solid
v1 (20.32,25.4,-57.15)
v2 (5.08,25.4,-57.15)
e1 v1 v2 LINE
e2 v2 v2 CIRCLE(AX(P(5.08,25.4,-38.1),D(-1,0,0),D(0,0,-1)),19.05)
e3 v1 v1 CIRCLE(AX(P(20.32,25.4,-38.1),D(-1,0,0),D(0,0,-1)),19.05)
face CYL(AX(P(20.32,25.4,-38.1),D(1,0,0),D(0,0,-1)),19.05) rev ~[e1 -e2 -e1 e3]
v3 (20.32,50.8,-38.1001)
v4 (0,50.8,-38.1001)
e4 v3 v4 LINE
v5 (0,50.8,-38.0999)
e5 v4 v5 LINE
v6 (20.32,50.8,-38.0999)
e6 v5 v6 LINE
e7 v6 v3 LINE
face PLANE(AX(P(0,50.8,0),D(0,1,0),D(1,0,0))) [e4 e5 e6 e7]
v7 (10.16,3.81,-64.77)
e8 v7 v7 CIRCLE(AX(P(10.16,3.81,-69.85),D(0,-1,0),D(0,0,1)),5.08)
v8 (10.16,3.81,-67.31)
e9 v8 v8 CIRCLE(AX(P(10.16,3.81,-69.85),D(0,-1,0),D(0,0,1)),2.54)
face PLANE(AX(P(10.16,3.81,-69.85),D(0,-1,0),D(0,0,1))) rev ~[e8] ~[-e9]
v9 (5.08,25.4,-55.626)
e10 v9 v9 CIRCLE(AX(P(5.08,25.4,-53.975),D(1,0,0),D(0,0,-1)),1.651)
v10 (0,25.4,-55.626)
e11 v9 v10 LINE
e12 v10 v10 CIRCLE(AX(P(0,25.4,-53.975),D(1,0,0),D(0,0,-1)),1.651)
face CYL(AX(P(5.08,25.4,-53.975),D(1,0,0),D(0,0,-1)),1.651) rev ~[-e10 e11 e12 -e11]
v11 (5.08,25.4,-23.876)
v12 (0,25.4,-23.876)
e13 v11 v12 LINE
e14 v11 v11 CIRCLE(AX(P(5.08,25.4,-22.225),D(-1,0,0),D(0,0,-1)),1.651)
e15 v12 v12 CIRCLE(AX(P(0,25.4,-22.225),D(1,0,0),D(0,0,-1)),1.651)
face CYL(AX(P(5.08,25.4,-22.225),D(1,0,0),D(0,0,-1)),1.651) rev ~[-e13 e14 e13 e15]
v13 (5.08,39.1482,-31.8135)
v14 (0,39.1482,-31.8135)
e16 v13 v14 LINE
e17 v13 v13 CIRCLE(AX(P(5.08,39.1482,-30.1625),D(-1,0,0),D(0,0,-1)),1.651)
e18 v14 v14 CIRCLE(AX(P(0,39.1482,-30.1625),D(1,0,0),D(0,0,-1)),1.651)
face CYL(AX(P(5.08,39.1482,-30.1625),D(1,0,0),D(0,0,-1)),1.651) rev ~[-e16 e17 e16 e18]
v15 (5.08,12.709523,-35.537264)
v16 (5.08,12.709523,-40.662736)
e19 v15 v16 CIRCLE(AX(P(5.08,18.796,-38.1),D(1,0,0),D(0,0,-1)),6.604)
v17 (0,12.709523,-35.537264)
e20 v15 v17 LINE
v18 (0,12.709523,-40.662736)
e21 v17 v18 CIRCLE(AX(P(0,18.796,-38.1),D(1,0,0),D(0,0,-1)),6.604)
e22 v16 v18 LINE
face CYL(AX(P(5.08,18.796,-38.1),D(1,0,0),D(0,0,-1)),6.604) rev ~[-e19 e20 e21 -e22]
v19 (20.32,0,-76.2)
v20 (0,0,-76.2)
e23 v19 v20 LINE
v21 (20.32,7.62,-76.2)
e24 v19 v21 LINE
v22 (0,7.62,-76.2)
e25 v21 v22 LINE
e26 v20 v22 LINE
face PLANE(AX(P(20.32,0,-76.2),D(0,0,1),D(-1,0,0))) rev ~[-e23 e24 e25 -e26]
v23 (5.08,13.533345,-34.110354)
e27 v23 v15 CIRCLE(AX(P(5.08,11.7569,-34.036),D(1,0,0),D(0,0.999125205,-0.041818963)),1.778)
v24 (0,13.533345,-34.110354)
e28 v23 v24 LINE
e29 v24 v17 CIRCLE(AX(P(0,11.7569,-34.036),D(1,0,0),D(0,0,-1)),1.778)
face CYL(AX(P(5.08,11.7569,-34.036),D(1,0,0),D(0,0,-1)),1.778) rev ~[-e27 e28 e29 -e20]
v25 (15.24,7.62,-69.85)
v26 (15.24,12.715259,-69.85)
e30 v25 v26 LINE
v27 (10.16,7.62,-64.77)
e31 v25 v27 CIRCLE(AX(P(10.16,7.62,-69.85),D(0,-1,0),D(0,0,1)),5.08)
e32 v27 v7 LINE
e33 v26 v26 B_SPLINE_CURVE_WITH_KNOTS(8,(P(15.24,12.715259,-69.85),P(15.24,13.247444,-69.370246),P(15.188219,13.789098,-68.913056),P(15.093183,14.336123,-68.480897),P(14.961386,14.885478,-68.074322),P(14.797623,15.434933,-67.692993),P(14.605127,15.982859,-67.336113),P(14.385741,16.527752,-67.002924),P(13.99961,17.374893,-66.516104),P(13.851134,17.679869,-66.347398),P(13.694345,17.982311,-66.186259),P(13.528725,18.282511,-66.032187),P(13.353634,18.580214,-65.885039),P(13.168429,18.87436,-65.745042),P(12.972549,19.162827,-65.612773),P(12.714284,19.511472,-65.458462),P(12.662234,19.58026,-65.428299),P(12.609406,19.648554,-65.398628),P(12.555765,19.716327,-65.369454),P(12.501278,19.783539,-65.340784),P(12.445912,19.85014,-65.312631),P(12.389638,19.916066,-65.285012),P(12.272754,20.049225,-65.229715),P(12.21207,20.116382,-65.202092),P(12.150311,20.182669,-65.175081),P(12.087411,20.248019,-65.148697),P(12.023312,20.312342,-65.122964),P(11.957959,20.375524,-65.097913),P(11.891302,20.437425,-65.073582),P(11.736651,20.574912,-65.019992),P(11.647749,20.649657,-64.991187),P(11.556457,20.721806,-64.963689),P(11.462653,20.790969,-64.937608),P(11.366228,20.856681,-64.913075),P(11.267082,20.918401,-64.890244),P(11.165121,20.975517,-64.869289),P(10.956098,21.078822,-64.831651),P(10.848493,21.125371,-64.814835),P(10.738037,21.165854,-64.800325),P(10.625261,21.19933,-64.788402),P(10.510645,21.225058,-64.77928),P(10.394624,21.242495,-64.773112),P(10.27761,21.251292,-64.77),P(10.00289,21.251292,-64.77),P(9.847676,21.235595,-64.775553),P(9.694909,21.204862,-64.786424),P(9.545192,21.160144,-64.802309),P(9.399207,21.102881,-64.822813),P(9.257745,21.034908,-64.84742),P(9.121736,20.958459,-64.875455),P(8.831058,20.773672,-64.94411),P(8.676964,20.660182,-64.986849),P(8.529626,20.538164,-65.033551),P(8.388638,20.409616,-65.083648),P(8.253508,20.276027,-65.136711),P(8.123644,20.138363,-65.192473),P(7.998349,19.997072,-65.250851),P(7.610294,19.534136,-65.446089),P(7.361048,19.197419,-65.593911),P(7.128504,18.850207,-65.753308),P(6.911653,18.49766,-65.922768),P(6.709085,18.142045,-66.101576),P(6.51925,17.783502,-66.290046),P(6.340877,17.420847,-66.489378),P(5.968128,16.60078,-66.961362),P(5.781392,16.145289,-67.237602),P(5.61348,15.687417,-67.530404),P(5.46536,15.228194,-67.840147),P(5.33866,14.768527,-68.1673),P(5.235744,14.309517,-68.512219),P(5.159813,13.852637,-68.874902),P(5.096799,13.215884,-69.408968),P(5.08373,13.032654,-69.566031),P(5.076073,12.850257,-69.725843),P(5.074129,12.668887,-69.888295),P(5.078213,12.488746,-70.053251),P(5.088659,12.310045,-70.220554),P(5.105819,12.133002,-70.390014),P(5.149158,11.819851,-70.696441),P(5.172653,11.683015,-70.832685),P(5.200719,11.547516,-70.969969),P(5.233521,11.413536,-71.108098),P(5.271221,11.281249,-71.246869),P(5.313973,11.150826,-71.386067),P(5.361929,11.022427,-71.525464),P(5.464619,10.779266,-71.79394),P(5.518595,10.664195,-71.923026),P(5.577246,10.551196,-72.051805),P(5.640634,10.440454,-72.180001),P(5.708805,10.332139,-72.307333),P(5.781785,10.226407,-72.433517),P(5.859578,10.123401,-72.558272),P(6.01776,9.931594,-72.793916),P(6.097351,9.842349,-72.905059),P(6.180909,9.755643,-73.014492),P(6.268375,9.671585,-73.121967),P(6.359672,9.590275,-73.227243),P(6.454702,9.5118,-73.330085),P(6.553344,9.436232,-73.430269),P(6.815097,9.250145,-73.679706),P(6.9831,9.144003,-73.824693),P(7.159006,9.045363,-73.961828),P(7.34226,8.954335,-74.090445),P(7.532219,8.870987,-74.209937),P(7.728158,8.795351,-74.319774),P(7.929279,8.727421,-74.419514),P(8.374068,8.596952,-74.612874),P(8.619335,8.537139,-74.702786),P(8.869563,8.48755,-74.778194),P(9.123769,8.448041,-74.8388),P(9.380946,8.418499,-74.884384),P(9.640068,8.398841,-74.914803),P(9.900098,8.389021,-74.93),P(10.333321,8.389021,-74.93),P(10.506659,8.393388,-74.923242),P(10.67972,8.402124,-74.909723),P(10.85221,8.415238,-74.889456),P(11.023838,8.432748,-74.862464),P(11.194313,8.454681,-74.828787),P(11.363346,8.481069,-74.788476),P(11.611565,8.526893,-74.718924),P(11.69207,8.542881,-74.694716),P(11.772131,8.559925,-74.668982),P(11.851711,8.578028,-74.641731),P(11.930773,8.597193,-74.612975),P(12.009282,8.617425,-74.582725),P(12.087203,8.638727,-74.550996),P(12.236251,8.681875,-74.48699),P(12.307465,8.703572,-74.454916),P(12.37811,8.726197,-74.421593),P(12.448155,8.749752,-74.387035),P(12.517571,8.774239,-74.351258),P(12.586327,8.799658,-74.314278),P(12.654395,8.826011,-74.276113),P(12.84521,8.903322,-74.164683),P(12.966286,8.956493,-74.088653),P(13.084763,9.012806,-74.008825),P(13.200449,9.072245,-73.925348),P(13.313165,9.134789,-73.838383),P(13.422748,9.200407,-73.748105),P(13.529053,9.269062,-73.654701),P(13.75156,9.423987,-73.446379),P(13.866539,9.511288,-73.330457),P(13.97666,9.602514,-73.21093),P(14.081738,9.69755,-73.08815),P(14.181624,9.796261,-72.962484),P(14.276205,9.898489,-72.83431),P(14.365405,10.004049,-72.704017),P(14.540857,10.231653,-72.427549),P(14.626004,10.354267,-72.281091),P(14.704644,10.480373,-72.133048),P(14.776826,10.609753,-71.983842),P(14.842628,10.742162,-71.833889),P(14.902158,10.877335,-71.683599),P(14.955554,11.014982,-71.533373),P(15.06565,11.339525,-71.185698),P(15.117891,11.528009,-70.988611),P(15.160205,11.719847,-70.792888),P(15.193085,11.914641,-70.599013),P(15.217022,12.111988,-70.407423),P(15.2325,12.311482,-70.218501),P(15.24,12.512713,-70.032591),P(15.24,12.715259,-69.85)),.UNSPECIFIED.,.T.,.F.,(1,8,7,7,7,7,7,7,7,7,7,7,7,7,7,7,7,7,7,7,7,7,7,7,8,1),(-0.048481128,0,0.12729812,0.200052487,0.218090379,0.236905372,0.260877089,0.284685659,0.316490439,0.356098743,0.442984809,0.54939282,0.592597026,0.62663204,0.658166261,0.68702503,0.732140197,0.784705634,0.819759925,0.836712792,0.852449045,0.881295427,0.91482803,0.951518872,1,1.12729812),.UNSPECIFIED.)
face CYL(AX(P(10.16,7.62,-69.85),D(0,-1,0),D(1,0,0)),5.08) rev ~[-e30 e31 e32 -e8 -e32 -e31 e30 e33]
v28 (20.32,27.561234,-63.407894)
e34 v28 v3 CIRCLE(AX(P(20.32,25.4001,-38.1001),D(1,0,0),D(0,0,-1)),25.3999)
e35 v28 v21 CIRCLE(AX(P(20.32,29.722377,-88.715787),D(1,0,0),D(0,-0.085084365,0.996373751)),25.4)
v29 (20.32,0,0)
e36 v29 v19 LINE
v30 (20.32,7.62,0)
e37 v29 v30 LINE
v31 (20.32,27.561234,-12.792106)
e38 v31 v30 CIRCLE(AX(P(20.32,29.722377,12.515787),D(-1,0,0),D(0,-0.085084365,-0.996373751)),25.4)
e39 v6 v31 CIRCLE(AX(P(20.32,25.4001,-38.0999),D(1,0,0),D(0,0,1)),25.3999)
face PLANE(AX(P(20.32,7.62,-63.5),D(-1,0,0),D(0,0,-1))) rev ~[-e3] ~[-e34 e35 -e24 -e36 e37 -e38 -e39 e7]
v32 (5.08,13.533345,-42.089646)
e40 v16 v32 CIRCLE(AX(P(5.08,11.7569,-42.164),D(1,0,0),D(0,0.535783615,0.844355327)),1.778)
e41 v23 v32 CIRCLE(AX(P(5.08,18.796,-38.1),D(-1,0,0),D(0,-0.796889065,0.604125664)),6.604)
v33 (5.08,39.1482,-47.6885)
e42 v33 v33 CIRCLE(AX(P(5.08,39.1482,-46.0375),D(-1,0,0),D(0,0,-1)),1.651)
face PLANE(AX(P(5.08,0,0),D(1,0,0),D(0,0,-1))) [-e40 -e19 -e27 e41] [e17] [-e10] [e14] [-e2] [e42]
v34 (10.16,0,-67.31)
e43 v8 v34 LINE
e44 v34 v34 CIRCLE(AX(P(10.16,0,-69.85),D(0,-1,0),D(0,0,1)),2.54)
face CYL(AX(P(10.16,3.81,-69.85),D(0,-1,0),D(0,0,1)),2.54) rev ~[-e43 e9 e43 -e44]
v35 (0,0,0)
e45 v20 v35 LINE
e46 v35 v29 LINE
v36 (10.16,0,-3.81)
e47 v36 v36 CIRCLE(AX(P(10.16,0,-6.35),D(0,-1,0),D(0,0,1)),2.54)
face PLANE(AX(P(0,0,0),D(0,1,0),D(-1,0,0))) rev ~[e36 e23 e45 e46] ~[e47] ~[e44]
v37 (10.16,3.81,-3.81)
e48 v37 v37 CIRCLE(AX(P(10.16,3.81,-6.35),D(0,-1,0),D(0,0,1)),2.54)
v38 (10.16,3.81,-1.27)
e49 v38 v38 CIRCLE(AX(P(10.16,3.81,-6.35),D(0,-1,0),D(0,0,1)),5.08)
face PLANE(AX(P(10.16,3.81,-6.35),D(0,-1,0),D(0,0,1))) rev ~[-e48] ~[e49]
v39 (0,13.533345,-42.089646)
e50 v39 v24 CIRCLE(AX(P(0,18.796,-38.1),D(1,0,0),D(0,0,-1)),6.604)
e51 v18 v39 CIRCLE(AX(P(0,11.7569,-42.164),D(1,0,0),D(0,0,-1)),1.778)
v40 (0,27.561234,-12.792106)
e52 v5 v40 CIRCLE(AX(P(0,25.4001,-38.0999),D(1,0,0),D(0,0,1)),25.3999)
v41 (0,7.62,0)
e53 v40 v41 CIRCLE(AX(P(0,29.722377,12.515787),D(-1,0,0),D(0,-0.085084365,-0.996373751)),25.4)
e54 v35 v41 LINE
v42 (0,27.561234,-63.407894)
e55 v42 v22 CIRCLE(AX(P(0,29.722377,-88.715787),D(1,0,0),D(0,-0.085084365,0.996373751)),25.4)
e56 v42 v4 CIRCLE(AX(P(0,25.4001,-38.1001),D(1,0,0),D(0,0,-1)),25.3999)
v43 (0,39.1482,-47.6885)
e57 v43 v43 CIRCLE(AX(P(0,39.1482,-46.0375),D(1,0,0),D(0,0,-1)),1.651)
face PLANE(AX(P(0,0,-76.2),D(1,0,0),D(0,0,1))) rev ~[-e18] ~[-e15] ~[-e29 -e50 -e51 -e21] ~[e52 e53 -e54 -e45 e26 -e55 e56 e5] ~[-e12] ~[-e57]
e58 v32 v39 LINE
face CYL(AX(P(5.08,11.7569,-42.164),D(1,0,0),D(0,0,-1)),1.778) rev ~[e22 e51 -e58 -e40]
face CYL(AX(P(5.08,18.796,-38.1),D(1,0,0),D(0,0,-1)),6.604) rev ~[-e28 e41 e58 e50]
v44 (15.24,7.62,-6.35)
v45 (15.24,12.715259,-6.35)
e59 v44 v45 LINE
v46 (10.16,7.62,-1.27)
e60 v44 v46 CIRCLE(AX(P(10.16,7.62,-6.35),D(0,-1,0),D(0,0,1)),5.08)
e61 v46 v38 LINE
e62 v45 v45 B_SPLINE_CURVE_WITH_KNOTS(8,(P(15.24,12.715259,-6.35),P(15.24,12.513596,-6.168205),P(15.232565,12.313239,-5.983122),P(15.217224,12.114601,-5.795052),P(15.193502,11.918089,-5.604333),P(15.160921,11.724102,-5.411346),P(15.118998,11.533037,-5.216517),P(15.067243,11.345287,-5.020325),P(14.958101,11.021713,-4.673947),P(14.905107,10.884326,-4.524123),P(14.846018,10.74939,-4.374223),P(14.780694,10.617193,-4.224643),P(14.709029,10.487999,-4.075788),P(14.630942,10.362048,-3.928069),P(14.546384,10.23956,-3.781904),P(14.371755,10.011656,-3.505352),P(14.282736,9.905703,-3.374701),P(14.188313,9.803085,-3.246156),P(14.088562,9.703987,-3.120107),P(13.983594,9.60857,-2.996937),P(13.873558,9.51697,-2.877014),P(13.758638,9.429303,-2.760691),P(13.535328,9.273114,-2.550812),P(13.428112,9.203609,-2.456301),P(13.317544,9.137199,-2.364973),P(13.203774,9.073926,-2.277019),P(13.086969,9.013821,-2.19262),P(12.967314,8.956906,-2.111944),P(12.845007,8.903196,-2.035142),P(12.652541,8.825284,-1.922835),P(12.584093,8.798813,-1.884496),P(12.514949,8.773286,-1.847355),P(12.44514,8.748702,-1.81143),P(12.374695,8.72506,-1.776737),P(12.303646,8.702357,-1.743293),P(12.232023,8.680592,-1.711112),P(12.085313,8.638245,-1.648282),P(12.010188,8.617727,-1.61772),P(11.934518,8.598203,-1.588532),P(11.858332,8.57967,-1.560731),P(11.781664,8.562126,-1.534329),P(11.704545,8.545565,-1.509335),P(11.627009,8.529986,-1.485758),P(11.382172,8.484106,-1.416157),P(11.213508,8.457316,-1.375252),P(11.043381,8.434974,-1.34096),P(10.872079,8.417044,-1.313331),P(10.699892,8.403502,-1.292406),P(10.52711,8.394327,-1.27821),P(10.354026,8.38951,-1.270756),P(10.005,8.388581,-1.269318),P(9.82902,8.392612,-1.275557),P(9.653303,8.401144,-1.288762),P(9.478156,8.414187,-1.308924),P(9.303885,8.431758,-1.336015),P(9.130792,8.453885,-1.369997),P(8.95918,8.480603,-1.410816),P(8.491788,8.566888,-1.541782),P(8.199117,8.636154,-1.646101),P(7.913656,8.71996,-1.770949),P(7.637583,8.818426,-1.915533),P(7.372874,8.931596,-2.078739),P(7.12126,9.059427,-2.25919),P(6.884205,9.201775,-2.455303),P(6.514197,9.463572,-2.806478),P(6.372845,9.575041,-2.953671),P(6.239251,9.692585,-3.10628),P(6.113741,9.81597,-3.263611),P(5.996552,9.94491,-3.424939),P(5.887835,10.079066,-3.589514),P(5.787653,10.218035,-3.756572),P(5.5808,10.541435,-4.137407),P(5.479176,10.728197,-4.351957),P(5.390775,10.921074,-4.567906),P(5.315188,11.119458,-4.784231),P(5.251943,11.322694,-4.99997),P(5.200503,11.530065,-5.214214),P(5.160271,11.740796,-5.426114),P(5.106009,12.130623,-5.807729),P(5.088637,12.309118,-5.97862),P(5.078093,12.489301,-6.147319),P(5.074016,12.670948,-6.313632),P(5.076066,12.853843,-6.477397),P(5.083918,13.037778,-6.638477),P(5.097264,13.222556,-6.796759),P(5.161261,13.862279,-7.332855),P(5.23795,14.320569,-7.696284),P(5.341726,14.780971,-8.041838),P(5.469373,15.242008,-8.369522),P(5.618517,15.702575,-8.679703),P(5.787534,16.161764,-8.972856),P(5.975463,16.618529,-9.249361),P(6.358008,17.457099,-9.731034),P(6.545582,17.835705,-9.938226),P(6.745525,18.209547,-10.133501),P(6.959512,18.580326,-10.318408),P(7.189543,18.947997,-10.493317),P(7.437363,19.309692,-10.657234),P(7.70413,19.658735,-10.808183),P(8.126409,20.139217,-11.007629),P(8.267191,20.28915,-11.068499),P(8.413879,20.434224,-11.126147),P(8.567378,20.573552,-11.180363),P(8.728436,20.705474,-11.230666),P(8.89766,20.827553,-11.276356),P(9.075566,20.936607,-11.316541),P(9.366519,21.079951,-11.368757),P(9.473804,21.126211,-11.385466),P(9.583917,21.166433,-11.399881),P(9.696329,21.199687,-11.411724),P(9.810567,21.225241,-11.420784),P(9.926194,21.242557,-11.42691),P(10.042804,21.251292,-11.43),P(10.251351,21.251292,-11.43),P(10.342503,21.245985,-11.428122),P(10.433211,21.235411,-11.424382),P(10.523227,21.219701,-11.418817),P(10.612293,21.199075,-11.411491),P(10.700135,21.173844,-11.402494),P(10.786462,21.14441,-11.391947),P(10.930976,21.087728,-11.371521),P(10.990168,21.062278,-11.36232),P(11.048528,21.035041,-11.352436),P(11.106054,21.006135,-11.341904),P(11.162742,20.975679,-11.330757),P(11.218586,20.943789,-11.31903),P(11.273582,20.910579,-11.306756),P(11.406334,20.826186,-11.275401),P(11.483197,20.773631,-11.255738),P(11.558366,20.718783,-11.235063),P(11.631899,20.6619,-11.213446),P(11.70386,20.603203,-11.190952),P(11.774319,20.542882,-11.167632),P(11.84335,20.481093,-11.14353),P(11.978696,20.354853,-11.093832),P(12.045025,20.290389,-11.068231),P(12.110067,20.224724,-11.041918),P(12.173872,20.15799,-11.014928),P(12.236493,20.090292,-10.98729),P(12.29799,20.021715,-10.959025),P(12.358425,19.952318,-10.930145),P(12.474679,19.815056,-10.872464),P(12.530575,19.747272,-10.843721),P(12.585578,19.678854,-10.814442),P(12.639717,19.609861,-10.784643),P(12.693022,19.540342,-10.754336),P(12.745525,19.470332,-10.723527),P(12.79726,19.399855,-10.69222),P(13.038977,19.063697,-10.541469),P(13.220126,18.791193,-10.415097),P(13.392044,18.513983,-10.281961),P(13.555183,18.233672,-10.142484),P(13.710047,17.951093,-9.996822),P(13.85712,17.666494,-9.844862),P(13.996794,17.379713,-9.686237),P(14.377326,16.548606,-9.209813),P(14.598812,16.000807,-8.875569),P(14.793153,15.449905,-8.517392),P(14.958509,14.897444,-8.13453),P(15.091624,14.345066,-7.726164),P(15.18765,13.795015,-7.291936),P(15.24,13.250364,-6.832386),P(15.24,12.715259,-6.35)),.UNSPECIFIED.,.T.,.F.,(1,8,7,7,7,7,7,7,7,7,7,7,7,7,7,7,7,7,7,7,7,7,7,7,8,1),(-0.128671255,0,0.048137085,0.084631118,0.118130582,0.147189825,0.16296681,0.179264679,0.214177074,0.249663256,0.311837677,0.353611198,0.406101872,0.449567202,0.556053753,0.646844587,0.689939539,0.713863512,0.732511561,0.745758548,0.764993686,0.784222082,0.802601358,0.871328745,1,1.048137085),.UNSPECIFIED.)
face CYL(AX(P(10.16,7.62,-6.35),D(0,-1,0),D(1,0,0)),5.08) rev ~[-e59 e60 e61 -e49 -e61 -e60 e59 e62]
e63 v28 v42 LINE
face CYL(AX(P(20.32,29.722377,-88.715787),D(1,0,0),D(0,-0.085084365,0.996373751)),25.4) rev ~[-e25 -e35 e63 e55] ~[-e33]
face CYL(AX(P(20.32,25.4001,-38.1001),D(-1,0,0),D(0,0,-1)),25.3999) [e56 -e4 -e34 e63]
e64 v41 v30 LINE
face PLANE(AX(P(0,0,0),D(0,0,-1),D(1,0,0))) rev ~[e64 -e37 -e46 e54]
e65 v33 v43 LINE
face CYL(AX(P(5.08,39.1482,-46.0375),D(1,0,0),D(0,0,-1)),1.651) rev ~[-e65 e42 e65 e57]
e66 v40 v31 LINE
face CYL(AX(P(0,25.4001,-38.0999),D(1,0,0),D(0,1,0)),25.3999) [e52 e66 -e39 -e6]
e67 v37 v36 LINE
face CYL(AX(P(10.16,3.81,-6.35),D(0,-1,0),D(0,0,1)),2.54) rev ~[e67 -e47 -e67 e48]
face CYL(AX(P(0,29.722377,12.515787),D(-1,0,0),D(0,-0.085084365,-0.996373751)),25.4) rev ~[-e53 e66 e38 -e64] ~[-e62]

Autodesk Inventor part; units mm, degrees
ref_plane "YZ Plane" through (0, 0, 0) normal (1, 0, 0) x (0, 1, 0)
ref_plane "XZ Plane" through (0, 0, 0) normal (0, 1, 0) x (-1, 0, 0)
ref_plane "XY Plane" through (0, 0, 0) normal (0, 0, 1) x (1, 0, 0)
sketch "Sketch1" plane through (0, 0, 0) normal (0, 1, 0) x (-1, 0, 0)
  line L0 (0, 0) -> (-20.32, 0)
  line L1 (-20.32, 0) -> (-20.32, -76.2)
  line L2 (-20.32, -76.2) -> (0, -76.2)
  line L3 (0, -76.2) -> (0, 0)
  dimension "d0" = 20.32
  dimension "d1" = 76.2
extrude "Extrusion1" add sketch "Sketch1" along normal blind 7.62
sketch "Sketch2" plane through (0, 7.62, 0) normal (0, 1, 0) x (1, 0, 0)
  line L0 (0, 0) -> (0, 12.7)
  line L1 (0, 12.7) -> (20.32, 12.7)
  line L2 (20.32, 12.7) -> (20.32, 63.5)
  line L3 (20.32, 63.5) -> (0, 63.5)
  line L4 (0, 63.5) -> (0, 12.7)
  dimension "d4" = 12.7
  dimension "d5" = 20.32
  dimension "d6" = 50.8
extrude "Extrusion2" add sketch "Sketch2" along normal blind 43.18
sketch "Sketch3" plane through (20.32, 0, 0) normal (1, 0, 0) x (0, 0, -1)
  line L0 (12.7, 50.8) -> (63.5, 50.8) projected
  line L1 (38.1, 50.8) -> (38.1, 25.4)
  circle A0 centre (38.1, 25.4) radius 19.05
  point P0 (0, 0)
  dimension "d9" = 25.4
  dimension "d10" = 38.1
extrude "Extrusion3" cut sketch "Sketch3" against normal blind 15.24
fillet "Fillet1" radius 25.4 2 edges at (10.16, 50.8, -63.5) (10.16, 50.8, -12.7)
sketch "Sketch6" plane through (0, 7.62, 0) normal (0, 1, 0) x (1, 0, 0)
  line L0 (0, 0) -> (20.32, 0) projected
  line L1 (10.16, 0) -> (10.16, 6.35)
  line L2 (20.32, 76.2) -> (0, 76.2) projected
  line L3 (10.16, 76.2) -> (10.16, 69.85)
  dimension "d20" = 6.35
  dimension "d21" = 6.35
fillet "Fillet2" radius 25.4 2 edges at (10.16, 7.62, -63.5) (10.16, 7.62, -12.7)
hole "Hole1" at (10.16, 7.62, -6.35) at (10.16, 7.62, -69.85) direction (0, -1, 0) diameter 5.08 end through all counterbore diameter 10.16 counterbore depth 3.81
sketch "Sketch7" plane through (10.16, 7.62, -6.35) normal (0, -1, 0) x (1, 0, 0)
  circle A0 centre (0, 0) radius 5.08
  circle A1 centre (0, -63.5) radius 2.54 projected
  line L0 (-2.54, -63.5) -> (0, -63.5)
  circle A2 centre (0, -63.5) radius 5.08
  point P0 (-10.16, 6.35)
  dimension "d30" = 10.16
  dimension "d31" = 10.16
extrude "Extrusion5" cut sketch "Sketch7" against normal blind 15.24 contours A0 | A1 | A2
sketch "Sketch9" plane through (5.08, 25.4, -38.1) normal (1, 0, 0) x (0, 0, -1)
  line L0 (0, 0) -> (0, -6.604)
  circle A0 centre (0, -6.604) radius 6.604
  line L1 (0, -6.604) -> (-3.302, -12.3232)
  line L2 (0, -6.604) -> (6.604, -6.604) construction
  line L3 (0, -6.604) -> (3.302, -12.3232)
  line L4 (0, -6.604) -> (6.604, -6.604) construction
  line L5 (-3.302, -12.3232) -> (-4.064, -13.6431)
  line L6 (3.302, -12.3232) -> (4.064, -13.6431)
  line L7 (3.302, -12.3232) -> (4.826, -12.3232) construction
  circle A1 centre (-4.064, -13.6431) radius 1.778
  circle A2 centre (4.064, -13.6431) radius 1.778
  circle A3 centre (0, 0) radius 19.05 projected
  line L8 (-19.05, 0) -> (-17.526, 0)
  line L9 (-17.526, 0) -> (-15.875, 0)
  circle A4 centre (-15.875, 0) radius 1.651
  line L10 (19.05, 0) -> (17.526, 0)
  line L11 (17.526, 0) -> (15.875, 0)
  circle A5 centre (15.875, 0) radius 1.651
  line L12 (0, 0) -> (-9.525, 16.4978)
  line L13 (0, 0) -> (9.525, 16.4978)
  line L14 (-9.525, 16.4978) -> (-8.763, 15.178)
  line L15 (-8.763, 15.178) -> (-7.9375, 13.7482)
  line L16 (9.525, 16.4978) -> (8.763, 15.178)
  line L17 (8.763, 15.178) -> (7.9375, 13.7482)
  circle A6 centre (-7.9375, 13.7482) radius 1.651
  circle A7 centre (7.9375, 13.7482) radius 1.651
  point P0 (-38.1, -25.4)
  point P1 (-2.5627, -12.6905)
  point P2 (2.5627, -12.6905)
  point P3 (3.9897, -11.8666)
  point P4 (-3.9897, -11.8666)
  dimension "d47" = 6.604
  dimension "d48" = 120
  dimension "d49" = 60
  dimension "d50" = 1.524
  dimension "d51" = 1.524
  dimension "d52" = 60
  dimension "d53" = 3.556
  dimension "d54" = 3.556
  dimension "d55" = 1.524
  dimension "d56" = 1.651
  dimension "d57" = 1.524
  dimension "d58" = 1.651
  dimension "d59" = 1.524
  dimension "d60" = 1.651
  dimension "d61" = 1.524
  dimension "d62" = 1.651
extrude "Extrusion7" cut sketch "Sketch9" against normal blind 25.4 contours A0 A2 L3 L0 | L0 L1 A1 A0 | L3 A2 A0 A1 L1 | A1 L1 A0 | A0 A1 | A6 L12 | L12 A6 | A7 L13 | L13 A7 | A1 A0 L1 | A2 A0 L3 | L3 A0 A2 | A2 A0 | A4 | A5
properties part number "Motor Mount V2"
